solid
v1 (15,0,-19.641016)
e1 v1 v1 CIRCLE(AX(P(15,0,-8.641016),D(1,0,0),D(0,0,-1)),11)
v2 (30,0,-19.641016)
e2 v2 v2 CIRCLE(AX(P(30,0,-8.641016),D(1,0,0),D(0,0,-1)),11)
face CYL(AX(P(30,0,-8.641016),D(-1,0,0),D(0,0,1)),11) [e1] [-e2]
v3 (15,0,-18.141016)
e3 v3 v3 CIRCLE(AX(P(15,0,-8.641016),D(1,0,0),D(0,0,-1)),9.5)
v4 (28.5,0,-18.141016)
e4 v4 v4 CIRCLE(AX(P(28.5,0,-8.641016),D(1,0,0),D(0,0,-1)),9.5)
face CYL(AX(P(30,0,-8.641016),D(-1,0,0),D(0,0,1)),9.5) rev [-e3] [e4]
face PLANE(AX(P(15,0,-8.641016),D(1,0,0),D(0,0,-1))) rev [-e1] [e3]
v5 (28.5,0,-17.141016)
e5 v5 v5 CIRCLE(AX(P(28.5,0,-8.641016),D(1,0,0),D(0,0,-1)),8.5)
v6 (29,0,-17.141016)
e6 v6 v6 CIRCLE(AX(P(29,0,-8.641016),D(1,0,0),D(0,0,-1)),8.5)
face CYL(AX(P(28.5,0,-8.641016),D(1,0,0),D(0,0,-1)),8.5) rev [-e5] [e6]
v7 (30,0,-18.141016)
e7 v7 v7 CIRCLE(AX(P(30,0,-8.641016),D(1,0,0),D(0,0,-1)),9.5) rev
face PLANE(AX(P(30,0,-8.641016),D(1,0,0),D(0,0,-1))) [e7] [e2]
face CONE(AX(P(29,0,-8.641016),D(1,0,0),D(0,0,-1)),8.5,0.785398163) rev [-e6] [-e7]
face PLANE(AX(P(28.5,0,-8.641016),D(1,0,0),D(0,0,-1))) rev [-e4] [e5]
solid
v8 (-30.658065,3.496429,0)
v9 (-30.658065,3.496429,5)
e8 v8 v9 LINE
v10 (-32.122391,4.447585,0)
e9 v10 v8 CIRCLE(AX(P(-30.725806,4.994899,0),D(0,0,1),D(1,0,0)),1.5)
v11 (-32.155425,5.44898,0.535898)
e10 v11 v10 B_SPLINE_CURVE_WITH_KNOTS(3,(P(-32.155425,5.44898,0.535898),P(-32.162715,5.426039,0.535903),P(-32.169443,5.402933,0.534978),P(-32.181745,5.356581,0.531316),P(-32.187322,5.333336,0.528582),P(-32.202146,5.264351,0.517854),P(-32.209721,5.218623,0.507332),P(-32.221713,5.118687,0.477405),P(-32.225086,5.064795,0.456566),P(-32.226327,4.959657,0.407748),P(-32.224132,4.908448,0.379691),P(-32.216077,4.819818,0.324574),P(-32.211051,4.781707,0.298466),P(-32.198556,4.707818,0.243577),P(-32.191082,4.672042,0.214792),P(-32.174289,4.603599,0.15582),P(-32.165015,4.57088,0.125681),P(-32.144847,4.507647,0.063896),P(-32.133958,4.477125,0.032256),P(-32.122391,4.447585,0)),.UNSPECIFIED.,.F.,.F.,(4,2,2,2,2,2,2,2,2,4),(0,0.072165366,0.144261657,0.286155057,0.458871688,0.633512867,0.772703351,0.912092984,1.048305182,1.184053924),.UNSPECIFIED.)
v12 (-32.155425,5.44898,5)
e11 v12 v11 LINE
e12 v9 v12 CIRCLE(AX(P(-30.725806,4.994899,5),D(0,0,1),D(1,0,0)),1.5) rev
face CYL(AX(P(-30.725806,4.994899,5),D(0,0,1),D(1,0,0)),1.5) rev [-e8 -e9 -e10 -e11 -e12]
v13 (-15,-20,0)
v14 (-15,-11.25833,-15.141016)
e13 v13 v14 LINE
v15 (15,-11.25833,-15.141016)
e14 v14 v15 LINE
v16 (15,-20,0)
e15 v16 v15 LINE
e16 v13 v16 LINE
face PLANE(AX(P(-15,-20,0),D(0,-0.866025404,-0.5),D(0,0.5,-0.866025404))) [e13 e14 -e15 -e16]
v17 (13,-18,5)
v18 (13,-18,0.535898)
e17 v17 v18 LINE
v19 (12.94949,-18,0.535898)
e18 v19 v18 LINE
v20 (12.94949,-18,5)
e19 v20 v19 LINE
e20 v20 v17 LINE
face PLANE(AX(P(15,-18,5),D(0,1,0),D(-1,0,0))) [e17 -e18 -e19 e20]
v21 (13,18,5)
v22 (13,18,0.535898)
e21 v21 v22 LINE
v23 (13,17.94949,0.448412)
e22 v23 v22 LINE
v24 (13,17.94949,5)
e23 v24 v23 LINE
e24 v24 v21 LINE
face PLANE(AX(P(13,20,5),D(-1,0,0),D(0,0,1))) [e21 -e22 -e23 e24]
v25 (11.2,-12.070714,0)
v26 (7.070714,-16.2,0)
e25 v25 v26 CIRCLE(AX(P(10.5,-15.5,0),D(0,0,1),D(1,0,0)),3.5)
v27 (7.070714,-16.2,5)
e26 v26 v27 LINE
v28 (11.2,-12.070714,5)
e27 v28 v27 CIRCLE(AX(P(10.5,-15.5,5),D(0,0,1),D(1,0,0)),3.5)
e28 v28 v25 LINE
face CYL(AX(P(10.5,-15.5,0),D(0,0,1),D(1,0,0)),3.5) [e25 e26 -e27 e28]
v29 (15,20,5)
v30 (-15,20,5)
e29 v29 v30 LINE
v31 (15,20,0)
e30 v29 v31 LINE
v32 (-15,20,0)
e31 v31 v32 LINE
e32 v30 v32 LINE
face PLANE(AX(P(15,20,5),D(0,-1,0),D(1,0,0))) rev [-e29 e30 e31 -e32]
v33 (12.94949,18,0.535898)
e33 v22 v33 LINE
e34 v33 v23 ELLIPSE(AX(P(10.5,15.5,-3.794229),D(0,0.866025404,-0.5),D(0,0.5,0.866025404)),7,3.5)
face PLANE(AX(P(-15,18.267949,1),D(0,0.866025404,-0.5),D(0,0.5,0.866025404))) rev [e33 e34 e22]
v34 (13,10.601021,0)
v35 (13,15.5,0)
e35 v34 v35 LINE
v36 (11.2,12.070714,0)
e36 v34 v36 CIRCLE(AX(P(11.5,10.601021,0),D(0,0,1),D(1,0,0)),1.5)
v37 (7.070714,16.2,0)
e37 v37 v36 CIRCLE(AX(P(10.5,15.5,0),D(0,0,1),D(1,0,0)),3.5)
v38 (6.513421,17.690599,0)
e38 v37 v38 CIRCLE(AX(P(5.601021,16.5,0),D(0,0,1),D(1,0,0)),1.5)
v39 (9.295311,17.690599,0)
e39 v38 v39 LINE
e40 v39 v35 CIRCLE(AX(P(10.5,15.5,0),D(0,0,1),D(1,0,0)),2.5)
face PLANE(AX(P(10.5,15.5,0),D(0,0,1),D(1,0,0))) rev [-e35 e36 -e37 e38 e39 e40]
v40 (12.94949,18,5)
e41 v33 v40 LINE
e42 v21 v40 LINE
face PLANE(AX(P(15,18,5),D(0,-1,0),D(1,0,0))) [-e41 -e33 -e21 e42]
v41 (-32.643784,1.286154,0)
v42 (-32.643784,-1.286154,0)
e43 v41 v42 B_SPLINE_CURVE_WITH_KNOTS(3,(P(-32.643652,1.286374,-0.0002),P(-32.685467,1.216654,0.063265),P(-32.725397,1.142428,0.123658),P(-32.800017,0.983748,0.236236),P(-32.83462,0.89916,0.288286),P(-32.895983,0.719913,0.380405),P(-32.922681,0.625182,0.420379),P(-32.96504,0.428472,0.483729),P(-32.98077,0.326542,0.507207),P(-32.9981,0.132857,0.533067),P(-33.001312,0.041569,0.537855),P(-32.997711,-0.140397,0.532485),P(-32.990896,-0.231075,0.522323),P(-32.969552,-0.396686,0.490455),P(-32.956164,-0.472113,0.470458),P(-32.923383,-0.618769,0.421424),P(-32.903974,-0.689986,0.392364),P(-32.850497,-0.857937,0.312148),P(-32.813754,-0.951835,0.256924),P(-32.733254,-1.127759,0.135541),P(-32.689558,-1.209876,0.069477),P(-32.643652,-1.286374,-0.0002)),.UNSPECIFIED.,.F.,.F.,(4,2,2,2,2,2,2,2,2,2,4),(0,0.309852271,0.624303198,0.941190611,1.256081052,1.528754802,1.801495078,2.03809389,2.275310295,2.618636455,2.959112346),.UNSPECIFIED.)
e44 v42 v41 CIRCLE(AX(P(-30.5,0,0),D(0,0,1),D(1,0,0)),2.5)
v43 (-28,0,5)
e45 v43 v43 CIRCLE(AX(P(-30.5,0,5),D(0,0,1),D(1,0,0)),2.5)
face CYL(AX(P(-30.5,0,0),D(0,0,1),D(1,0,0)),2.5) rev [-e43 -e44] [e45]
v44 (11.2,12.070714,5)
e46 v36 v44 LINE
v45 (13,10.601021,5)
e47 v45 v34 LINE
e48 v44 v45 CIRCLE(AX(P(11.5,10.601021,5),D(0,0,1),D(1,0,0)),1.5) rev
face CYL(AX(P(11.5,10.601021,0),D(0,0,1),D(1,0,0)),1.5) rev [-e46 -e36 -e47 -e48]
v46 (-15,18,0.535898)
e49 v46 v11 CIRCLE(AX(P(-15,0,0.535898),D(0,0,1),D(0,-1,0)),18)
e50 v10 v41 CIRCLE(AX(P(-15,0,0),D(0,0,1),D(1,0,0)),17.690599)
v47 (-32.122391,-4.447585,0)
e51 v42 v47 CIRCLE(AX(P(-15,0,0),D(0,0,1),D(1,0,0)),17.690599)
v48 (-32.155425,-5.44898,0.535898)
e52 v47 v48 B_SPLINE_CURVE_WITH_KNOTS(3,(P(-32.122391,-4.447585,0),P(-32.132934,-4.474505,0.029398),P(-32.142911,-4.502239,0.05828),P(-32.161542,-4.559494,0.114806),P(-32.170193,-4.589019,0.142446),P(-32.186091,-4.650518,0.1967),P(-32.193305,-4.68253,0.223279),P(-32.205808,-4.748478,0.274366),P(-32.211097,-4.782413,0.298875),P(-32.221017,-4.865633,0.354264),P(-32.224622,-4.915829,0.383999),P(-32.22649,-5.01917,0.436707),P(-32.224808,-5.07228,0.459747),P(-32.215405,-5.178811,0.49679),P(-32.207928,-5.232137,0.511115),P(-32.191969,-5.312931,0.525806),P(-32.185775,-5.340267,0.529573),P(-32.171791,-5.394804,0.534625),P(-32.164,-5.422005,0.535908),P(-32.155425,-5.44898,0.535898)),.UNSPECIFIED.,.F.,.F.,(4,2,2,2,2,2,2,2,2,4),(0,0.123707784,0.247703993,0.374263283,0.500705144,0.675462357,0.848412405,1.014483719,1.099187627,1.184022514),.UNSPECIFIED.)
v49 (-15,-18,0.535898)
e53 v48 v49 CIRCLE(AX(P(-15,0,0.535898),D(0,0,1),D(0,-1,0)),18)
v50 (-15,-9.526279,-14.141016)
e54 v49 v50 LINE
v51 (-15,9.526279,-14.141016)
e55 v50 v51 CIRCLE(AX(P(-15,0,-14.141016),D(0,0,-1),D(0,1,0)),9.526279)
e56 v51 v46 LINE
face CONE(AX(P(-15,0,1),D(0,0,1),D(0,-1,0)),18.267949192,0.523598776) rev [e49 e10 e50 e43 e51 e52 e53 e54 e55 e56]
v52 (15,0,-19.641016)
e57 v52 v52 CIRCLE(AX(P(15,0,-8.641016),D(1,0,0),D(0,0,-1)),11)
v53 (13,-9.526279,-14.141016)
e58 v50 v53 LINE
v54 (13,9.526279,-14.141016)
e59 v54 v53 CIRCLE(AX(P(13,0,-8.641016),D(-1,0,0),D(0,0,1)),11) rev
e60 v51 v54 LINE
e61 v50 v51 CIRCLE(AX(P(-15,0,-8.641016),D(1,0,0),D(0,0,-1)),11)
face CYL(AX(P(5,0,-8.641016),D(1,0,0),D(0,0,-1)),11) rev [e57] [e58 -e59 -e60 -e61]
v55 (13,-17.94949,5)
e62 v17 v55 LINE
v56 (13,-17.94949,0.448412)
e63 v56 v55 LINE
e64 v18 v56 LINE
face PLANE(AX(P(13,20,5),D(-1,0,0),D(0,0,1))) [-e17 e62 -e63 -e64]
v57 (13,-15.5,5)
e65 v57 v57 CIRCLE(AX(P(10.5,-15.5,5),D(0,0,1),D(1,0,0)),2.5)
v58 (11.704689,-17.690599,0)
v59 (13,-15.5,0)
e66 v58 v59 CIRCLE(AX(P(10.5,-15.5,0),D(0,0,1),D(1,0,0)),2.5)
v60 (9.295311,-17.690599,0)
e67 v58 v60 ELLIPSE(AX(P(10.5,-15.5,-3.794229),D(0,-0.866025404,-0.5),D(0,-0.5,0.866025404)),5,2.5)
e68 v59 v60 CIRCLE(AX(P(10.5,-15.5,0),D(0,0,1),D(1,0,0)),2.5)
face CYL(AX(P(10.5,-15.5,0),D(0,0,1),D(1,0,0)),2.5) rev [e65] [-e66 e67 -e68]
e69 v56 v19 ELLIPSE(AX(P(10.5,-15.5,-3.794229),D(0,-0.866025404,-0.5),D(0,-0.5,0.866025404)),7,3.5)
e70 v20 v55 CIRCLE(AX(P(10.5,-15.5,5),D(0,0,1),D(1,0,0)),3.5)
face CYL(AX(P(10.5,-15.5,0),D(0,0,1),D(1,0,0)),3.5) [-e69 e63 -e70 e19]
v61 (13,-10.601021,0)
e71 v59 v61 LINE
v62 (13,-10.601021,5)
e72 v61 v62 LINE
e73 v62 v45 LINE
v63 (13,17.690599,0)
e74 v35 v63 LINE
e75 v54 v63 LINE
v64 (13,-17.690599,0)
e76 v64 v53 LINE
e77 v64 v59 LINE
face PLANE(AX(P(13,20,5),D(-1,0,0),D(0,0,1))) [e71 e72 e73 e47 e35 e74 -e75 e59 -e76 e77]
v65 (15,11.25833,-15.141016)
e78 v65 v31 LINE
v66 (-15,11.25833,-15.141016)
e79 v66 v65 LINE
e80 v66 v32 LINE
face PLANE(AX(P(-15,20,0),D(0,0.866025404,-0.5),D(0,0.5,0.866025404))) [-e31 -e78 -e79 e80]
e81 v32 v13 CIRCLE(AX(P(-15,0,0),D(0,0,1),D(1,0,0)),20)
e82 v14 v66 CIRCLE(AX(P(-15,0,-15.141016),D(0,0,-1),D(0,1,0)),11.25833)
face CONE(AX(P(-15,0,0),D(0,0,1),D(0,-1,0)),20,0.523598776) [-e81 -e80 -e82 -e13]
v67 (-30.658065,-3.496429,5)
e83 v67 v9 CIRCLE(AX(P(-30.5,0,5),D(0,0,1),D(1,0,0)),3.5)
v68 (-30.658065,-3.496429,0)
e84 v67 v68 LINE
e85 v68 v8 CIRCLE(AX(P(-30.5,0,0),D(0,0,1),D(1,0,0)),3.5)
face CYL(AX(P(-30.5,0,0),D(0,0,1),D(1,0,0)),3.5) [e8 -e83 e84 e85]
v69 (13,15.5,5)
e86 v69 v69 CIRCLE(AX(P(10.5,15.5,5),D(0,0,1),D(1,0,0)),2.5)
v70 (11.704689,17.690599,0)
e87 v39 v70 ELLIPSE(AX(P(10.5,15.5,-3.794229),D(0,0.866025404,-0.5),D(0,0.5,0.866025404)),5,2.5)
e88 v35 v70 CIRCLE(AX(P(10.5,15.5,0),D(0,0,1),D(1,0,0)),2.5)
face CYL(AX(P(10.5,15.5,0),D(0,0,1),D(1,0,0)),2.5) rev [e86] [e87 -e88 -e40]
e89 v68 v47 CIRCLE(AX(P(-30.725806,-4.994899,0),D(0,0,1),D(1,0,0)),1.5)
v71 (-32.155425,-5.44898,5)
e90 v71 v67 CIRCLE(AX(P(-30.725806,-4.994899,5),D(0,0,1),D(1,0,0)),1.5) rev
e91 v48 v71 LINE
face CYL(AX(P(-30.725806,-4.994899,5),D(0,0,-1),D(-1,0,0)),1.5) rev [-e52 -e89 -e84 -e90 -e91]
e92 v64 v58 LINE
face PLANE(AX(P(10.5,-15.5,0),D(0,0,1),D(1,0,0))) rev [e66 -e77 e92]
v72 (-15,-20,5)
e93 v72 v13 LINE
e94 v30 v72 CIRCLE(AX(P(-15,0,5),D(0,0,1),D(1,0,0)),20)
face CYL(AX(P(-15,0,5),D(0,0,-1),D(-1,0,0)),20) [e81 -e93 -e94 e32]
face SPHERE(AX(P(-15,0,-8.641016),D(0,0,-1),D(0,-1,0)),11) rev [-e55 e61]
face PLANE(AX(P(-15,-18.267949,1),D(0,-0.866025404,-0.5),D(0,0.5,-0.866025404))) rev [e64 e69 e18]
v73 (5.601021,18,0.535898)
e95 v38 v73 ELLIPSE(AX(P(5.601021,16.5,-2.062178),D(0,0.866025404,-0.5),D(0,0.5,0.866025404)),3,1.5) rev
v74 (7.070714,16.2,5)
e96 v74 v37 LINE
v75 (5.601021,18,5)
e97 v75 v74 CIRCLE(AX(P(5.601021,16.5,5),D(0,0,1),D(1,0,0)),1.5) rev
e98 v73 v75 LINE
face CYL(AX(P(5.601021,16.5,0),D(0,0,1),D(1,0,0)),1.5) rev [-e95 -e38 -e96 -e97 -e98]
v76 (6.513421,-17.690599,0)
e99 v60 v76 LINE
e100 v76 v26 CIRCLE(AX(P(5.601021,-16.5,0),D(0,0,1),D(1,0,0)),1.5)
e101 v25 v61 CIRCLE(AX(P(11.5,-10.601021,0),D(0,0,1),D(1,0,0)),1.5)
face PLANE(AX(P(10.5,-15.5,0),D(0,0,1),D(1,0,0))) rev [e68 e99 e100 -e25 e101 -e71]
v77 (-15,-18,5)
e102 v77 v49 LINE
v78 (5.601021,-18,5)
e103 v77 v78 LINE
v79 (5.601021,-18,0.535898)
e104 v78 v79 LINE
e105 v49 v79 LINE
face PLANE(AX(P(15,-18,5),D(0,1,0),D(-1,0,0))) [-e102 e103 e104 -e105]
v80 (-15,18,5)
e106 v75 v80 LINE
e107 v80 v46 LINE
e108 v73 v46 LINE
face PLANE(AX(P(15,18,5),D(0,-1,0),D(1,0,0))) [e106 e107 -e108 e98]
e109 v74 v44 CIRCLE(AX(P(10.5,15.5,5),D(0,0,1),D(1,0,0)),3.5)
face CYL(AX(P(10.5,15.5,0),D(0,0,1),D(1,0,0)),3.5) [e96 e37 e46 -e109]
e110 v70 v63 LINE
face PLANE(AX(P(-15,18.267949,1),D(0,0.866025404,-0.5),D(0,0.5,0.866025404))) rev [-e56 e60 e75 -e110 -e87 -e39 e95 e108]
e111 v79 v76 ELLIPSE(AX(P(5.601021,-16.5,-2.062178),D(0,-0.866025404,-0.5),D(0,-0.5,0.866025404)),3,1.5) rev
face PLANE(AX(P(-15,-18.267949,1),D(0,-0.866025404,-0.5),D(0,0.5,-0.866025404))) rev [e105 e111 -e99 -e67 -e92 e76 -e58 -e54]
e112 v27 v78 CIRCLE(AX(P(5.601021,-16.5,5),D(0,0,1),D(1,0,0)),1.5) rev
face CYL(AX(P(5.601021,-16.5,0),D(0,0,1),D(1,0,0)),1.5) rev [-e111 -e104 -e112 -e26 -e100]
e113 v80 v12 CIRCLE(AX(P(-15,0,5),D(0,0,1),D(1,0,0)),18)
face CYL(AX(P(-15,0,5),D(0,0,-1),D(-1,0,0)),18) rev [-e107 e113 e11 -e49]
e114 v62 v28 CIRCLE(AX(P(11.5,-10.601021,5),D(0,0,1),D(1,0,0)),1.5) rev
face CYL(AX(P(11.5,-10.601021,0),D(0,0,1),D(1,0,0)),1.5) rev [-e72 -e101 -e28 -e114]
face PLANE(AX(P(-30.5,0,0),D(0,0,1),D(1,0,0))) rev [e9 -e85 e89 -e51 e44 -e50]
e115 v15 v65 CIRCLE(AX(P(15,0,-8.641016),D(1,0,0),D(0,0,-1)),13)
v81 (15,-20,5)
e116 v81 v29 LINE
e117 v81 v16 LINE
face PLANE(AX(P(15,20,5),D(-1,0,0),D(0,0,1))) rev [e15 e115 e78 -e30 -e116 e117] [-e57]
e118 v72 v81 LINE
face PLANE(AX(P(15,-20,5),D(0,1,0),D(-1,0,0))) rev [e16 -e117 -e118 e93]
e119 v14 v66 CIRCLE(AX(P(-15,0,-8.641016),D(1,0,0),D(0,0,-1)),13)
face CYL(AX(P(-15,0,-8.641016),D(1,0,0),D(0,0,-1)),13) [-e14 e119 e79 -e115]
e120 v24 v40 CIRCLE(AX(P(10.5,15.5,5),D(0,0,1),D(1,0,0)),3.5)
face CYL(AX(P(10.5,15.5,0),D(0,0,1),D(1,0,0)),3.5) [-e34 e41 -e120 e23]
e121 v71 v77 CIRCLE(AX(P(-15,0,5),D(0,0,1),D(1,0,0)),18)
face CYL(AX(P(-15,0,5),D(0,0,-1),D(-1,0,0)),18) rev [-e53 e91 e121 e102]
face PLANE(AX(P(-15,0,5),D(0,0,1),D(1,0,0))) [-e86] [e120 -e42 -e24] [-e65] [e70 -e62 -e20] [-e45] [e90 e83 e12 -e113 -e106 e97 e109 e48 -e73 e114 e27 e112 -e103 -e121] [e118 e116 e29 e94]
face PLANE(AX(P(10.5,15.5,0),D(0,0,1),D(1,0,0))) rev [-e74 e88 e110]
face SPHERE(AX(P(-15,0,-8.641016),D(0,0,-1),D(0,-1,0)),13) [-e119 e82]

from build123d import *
from build123d.topology import SkipClean

# Parameters (mm, degrees)
EXTRUDE_3_DEPTH     = 5
EXTRUDE_4_DEPTH     = 30
REVOLVE_2_ANGLE     = 180
SKETCH_7_R          = 11
CUT_EXTRUDE_1_DEPTH = 10
SHELL_START         = -15.0000001
SHELL_1_DEPTH       = 28.0000001
SKETCH_8_R          = 3.5
SKETCH_8_R_2        = 2.5
EXTRUDE_5_DEPTH     = 5
FILLET_2_R          = 1.5
SKETCH_9_R          = 11
SKETCH_9_R_2        = 9.5
EXTRUDE_6_DEPTH     = 15
SKETCH_10_R         = 9.5
SKETCH_10_R_2       = 8.5
EXTRUDE_7_DEPTH     = 1.5
CHAMFER_1_SIZE      = 1


with BuildPart() as part:
    # 草图4 → 凸台-拉伸3 (new body)
    with BuildSketch(Plane.XY):
        with BuildLine():
            Line((15, 20), (-15, 20))
            ThreePointArc((-15, 20), (-35, 0), (-15, -20))
            Line((-15, -20), (15, -20))
            Line((15, -20), (15, 20))
        make_face()
    extrude(amount=EXTRUDE_3_DEPTH)

    # 草图5 → 凸台-拉伸4 (add)
    with BuildSketch(Plane(origin=(15, 0, 0), x_dir=(0, 0, -1), z_dir=(1, 0, 0))):
        with BuildLine():
            Line((0, 20), (15.141016151, 11.258330249))
            ThreePointArc((15.141016151, 11.258330249), (21.641016151, 0), (15.141016151, -11.258330249))
            Line((15.141016151, -11.258330249), (0, -20))
            Line((0, -20), (0, 20))
        make_face()
    extrude(amount=-EXTRUDE_4_DEPTH)

    # 草图6 → 旋转2 (revolve)
    with BuildSketch(Plane.ZY.offset(15)):
        with BuildLine():
            Line((-21.641016151, 0), (0, 0))
            Line((0, 0), (0, 20))
            Line((0, 20), (-15.141016151, 11.258330249))
            ThreePointArc((-15.141016151, 11.258330249), (-19.899346401, 6.5), (-21.641016151, 0))
        make_face()
    revolve(axis=Axis((-15, 0, 0), (0, 0, 1)), revolution_arc=REVOLVE_2_ANGLE)

    # 草图7 → 切除-拉伸1 (cut)
    with BuildSketch(Plane(origin=(15, 0, 0), x_dir=(0, 0, -1), z_dir=(1, 0, 0))):
        with Locations((8.641016151, 0)):
            Circle(SKETCH_7_R)
    extrude(amount=-CUT_EXTRUDE_1_DEPTH, mode=Mode.SUBTRACT)

    # 抽壳1: read off the stored shape, not the designer's step
    # 抽壳1 outline → 抽壳1 (cut)
    with SkipClean():  # the faces are left unmerged after this step: merging them gives an invalid solid
        with BuildSketch(Plane.YZ.offset(SHELL_START)):
            with BuildLine():
                ThreePointArc((-9.526279442, -14.141016151), (0, -19.641016151), (9.526279442, -14.141016151))
                Line((9.526279442, -14.141016151), (18, 0.535898385))
                Line((18, 0.535898385), (18, 5))
                Line((18, 5), (-18, 5))
                Line((-18, 5), (-18, 0.535898385))
                Line((-18, 0.535898385), (-9.526279442, -14.141016151))
            make_face()
        extrude(amount=SHELL_1_DEPTH, mode=Mode.SUBTRACT)
    add(part.part.scale(1), mode=Mode.REPLACE)  # the faces are merged on a copy

    # Shell 1 2 outline → Shell 1 2 (revolve, cut)
    with BuildSketch(Plane(origin=(-15, 0, 0), x_dir=(1, 0, 0), z_dir=(0, -1, 0))):
        with BuildLine():
            Line((18, 0.535898385), (18, 5))
            Line((18, 5), (0, 5))
            Line((0, 5), (0, -19.641016151))
            ThreePointArc((0, -19.641016151), (5.5, -18.167295593), (9.526279442, -14.141016151))
            Line((9.526279442, -14.141016151), (18, 0.535898385))
        make_face()
    revolve(axis=Axis((-15, 0, 0), (0, 0, 1)), mode=Mode.SUBTRACT)

    # 草图8 → 凸台-拉伸5 (add)
    # profile 1 of 3: a face of its own
    with BuildSketch(Plane.XY.offset(5)):
        with Locations((-30.5, 0)):
            Circle(SKETCH_8_R)
        with Locations((-30.5, 0)):
            Circle(SKETCH_8_R_2, mode=Mode.SUBTRACT)
    # profile 2 of 3: a face of its own
    with BuildSketch(Plane.XY.offset(5)):
        with Locations((10.5, 15.5)):
            Circle(SKETCH_8_R)
        with Locations((10.5, 15.5)):
            Circle(SKETCH_8_R_2, mode=Mode.SUBTRACT)
    # profile 3 of 3: a face of its own
    with BuildSketch(Plane.XY.offset(5)):
        with Locations((10.5, -15.5)):
            Circle(SKETCH_8_R)
        with Locations((10.5, -15.5)):
            Circle(SKETCH_8_R_2, mode=Mode.SUBTRACT)
    extrude(amount=-EXTRUDE_5_DEPTH)

    # 圆角2
    # the kernel refuses this fillet: 1.5 mm, written as the material it adds along each edge
    with BuildSketch(Plane(origin=(13, -13.050510257, 0), x_dir=(0, 1, 0), z_dir=(0, 0, 1))) as fillet_2_piece_1:
        with BuildLine():
            CenterArc((2.449489743, 1.5), FILLET_2_R, 168.463040967, 101.536959033)
            ThreePointArc((0.979795897, 1.8), (0.624595487, 0.826679947), (0, 0))
            Line((0, 0), (2.449489743, 0))
        make_face()
    extrude(amount=5)
    with BuildSketch(Plane(origin=(8.050510257, -18, -5.587825972), x_dir=(-1, 0, 0), z_dir=(0, 0, 1))) as fillet_2_piece_2_section:
        with BuildLine():
            CenterArc((2.449489743, -1.5), FILLET_2_R, 90, 101.536959033)
            ThreePointArc((0.979795897, -1.8), (0.624595487, -0.826679947), (0, 0))
            Line((0, 0), (2.449489743, 0))
        make_face()
    fillet_2_piece_2 = extrude(amount=10.587825972, mode=Mode.PRIVATE)
    fillet_2_piece_2 = split(fillet_2_piece_2, bisect_by=Plane(origin=(8.050510257, -18, 0), z_dir=(0, 0, 1)), keep=Keep.TOP, mode=Mode.PRIVATE)
    add(fillet_2_piece_2)
    with BuildSketch(Plane(origin=(8.050510257, 18, -5.587825972), x_dir=(-1, 0, 0), z_dir=(0, 0, 1))) as fillet_2_piece_3_section:
        with BuildLine():
            CenterArc((2.449489743, 1.5), FILLET_2_R, 168.463040967, 101.536959033)
            ThreePointArc((0.979795897, 1.8), (0.624595487, 0.826679947), (0, 0))
            Line((0, 0), (2.449489743, 0))
        make_face()
    fillet_2_piece_3 = extrude(amount=10.587825972, mode=Mode.PRIVATE)
    fillet_2_piece_3 = split(fillet_2_piece_3, bisect_by=Plane(origin=(8.050510257, 18, 0), z_dir=(0, 0, 1)), keep=Keep.TOP, mode=Mode.PRIVATE)
    add(fillet_2_piece_3)
    with BuildSketch(Plane(origin=(13, 13.050510257, 0), x_dir=(0, -1, 0), z_dir=(0, 0, 1))) as fillet_2_piece_4:
        with BuildLine():
            CenterArc((2.449489743, -1.5), FILLET_2_R, 90, 101.536959033)
            ThreePointArc((0.979795897, -1.8), (0.624595487, -0.826679947), (0, 0))
            Line((0, 0), (2.449489743, 0))
        make_face()
    extrude(amount=5)
    with BuildSketch(Plane(origin=(-32.806451613, -2.632542679, -6.690855654), x_dir=(0.22521397209049301, -0.974309328075649, 0), z_dir=(0, 0, 1))) as fillet_2_piece_5_section:
        with BuildLine():
            CenterArc((2.770255715, 1.495156442), FILLET_2_R, 164.396107483, 110.209545374)
            ThreePointArc((1.325539273, 1.898634324), (0.824332497, 0.836521394), (0, 0))
            ThreePointArc((0, 0), (1.445350808, -0.0581227), (2.890701616, 0))
        make_face()
    fillet_2_piece_5 = extrude(amount=11.690855654, mode=Mode.PRIVATE)
    fillet_2_piece_5 = split(fillet_2_piece_5, bisect_by=Plane(origin=(-32.806451613, -2.632542679, 0), z_dir=(0, 0, 1)), keep=Keep.TOP, mode=Mode.PRIVATE)
    add(fillet_2_piece_5)
    with BuildSketch(Plane(origin=(-32.806451613, 2.632542679, -6.690855654), x_dir=(0.2252139720904933, 0.974309328075649, 0), z_dir=(0, 0, 1))) as fillet_2_piece_6_section:
        with BuildLine():
            CenterArc((2.770255715, -1.495156442), FILLET_2_R, 85.394347143, 110.209545374)
            ThreePointArc((1.325539273, -1.898634324), (0.824332497, -0.836521394), (0, 0))
            ThreePointArc((0, 0), (1.445350808, 0.0581227), (2.890701616, 0))
        make_face()
    fillet_2_piece_6 = extrude(amount=11.690855654, mode=Mode.PRIVATE)
    fillet_2_piece_6 = split(fillet_2_piece_6, bisect_by=Plane(origin=(-32.806451613, 2.632542679, 0), z_dir=(0, 0, 1)), keep=Keep.TOP, mode=Mode.PRIVATE)
    add(fillet_2_piece_6)


with BuildPart() as body_2:
    # 草图9 → 凸台-拉伸6 (new body)
    with BuildSketch(Plane(origin=(15, 0, 0), x_dir=(0, 0, -1), z_dir=(1, 0, 0))):
        with Locations((8.641016151, 0)):
            Circle(SKETCH_9_R)
        with Locations((8.641016151, 0)):
            Circle(SKETCH_9_R_2, mode=Mode.SUBTRACT)
    extrude(amount=EXTRUDE_6_DEPTH)

    # 草图10 → 凸台-拉伸7 (add)
    with BuildSketch(Plane(origin=(30, 0, 0), x_dir=(0, 0, -1), z_dir=(1, 0, 0))):
        with Locations((8.641016151, 0)):
            Circle(SKETCH_10_R)
        with Locations((8.641016151, 0)):
            Circle(SKETCH_10_R_2, mode=Mode.SUBTRACT)
    extrude(amount=-EXTRUDE_7_DEPTH)

    # 倒角1
    chamfer_1_edges = [body_2.edges().sort_by_distance(p)[0] for p in [
        (30, 0, -0.141016151),
    ]]
    chamfer(chamfer_1_edges, length=CHAMFER_1_SIZE)


solid = Compound([part.part, body_2.part])
